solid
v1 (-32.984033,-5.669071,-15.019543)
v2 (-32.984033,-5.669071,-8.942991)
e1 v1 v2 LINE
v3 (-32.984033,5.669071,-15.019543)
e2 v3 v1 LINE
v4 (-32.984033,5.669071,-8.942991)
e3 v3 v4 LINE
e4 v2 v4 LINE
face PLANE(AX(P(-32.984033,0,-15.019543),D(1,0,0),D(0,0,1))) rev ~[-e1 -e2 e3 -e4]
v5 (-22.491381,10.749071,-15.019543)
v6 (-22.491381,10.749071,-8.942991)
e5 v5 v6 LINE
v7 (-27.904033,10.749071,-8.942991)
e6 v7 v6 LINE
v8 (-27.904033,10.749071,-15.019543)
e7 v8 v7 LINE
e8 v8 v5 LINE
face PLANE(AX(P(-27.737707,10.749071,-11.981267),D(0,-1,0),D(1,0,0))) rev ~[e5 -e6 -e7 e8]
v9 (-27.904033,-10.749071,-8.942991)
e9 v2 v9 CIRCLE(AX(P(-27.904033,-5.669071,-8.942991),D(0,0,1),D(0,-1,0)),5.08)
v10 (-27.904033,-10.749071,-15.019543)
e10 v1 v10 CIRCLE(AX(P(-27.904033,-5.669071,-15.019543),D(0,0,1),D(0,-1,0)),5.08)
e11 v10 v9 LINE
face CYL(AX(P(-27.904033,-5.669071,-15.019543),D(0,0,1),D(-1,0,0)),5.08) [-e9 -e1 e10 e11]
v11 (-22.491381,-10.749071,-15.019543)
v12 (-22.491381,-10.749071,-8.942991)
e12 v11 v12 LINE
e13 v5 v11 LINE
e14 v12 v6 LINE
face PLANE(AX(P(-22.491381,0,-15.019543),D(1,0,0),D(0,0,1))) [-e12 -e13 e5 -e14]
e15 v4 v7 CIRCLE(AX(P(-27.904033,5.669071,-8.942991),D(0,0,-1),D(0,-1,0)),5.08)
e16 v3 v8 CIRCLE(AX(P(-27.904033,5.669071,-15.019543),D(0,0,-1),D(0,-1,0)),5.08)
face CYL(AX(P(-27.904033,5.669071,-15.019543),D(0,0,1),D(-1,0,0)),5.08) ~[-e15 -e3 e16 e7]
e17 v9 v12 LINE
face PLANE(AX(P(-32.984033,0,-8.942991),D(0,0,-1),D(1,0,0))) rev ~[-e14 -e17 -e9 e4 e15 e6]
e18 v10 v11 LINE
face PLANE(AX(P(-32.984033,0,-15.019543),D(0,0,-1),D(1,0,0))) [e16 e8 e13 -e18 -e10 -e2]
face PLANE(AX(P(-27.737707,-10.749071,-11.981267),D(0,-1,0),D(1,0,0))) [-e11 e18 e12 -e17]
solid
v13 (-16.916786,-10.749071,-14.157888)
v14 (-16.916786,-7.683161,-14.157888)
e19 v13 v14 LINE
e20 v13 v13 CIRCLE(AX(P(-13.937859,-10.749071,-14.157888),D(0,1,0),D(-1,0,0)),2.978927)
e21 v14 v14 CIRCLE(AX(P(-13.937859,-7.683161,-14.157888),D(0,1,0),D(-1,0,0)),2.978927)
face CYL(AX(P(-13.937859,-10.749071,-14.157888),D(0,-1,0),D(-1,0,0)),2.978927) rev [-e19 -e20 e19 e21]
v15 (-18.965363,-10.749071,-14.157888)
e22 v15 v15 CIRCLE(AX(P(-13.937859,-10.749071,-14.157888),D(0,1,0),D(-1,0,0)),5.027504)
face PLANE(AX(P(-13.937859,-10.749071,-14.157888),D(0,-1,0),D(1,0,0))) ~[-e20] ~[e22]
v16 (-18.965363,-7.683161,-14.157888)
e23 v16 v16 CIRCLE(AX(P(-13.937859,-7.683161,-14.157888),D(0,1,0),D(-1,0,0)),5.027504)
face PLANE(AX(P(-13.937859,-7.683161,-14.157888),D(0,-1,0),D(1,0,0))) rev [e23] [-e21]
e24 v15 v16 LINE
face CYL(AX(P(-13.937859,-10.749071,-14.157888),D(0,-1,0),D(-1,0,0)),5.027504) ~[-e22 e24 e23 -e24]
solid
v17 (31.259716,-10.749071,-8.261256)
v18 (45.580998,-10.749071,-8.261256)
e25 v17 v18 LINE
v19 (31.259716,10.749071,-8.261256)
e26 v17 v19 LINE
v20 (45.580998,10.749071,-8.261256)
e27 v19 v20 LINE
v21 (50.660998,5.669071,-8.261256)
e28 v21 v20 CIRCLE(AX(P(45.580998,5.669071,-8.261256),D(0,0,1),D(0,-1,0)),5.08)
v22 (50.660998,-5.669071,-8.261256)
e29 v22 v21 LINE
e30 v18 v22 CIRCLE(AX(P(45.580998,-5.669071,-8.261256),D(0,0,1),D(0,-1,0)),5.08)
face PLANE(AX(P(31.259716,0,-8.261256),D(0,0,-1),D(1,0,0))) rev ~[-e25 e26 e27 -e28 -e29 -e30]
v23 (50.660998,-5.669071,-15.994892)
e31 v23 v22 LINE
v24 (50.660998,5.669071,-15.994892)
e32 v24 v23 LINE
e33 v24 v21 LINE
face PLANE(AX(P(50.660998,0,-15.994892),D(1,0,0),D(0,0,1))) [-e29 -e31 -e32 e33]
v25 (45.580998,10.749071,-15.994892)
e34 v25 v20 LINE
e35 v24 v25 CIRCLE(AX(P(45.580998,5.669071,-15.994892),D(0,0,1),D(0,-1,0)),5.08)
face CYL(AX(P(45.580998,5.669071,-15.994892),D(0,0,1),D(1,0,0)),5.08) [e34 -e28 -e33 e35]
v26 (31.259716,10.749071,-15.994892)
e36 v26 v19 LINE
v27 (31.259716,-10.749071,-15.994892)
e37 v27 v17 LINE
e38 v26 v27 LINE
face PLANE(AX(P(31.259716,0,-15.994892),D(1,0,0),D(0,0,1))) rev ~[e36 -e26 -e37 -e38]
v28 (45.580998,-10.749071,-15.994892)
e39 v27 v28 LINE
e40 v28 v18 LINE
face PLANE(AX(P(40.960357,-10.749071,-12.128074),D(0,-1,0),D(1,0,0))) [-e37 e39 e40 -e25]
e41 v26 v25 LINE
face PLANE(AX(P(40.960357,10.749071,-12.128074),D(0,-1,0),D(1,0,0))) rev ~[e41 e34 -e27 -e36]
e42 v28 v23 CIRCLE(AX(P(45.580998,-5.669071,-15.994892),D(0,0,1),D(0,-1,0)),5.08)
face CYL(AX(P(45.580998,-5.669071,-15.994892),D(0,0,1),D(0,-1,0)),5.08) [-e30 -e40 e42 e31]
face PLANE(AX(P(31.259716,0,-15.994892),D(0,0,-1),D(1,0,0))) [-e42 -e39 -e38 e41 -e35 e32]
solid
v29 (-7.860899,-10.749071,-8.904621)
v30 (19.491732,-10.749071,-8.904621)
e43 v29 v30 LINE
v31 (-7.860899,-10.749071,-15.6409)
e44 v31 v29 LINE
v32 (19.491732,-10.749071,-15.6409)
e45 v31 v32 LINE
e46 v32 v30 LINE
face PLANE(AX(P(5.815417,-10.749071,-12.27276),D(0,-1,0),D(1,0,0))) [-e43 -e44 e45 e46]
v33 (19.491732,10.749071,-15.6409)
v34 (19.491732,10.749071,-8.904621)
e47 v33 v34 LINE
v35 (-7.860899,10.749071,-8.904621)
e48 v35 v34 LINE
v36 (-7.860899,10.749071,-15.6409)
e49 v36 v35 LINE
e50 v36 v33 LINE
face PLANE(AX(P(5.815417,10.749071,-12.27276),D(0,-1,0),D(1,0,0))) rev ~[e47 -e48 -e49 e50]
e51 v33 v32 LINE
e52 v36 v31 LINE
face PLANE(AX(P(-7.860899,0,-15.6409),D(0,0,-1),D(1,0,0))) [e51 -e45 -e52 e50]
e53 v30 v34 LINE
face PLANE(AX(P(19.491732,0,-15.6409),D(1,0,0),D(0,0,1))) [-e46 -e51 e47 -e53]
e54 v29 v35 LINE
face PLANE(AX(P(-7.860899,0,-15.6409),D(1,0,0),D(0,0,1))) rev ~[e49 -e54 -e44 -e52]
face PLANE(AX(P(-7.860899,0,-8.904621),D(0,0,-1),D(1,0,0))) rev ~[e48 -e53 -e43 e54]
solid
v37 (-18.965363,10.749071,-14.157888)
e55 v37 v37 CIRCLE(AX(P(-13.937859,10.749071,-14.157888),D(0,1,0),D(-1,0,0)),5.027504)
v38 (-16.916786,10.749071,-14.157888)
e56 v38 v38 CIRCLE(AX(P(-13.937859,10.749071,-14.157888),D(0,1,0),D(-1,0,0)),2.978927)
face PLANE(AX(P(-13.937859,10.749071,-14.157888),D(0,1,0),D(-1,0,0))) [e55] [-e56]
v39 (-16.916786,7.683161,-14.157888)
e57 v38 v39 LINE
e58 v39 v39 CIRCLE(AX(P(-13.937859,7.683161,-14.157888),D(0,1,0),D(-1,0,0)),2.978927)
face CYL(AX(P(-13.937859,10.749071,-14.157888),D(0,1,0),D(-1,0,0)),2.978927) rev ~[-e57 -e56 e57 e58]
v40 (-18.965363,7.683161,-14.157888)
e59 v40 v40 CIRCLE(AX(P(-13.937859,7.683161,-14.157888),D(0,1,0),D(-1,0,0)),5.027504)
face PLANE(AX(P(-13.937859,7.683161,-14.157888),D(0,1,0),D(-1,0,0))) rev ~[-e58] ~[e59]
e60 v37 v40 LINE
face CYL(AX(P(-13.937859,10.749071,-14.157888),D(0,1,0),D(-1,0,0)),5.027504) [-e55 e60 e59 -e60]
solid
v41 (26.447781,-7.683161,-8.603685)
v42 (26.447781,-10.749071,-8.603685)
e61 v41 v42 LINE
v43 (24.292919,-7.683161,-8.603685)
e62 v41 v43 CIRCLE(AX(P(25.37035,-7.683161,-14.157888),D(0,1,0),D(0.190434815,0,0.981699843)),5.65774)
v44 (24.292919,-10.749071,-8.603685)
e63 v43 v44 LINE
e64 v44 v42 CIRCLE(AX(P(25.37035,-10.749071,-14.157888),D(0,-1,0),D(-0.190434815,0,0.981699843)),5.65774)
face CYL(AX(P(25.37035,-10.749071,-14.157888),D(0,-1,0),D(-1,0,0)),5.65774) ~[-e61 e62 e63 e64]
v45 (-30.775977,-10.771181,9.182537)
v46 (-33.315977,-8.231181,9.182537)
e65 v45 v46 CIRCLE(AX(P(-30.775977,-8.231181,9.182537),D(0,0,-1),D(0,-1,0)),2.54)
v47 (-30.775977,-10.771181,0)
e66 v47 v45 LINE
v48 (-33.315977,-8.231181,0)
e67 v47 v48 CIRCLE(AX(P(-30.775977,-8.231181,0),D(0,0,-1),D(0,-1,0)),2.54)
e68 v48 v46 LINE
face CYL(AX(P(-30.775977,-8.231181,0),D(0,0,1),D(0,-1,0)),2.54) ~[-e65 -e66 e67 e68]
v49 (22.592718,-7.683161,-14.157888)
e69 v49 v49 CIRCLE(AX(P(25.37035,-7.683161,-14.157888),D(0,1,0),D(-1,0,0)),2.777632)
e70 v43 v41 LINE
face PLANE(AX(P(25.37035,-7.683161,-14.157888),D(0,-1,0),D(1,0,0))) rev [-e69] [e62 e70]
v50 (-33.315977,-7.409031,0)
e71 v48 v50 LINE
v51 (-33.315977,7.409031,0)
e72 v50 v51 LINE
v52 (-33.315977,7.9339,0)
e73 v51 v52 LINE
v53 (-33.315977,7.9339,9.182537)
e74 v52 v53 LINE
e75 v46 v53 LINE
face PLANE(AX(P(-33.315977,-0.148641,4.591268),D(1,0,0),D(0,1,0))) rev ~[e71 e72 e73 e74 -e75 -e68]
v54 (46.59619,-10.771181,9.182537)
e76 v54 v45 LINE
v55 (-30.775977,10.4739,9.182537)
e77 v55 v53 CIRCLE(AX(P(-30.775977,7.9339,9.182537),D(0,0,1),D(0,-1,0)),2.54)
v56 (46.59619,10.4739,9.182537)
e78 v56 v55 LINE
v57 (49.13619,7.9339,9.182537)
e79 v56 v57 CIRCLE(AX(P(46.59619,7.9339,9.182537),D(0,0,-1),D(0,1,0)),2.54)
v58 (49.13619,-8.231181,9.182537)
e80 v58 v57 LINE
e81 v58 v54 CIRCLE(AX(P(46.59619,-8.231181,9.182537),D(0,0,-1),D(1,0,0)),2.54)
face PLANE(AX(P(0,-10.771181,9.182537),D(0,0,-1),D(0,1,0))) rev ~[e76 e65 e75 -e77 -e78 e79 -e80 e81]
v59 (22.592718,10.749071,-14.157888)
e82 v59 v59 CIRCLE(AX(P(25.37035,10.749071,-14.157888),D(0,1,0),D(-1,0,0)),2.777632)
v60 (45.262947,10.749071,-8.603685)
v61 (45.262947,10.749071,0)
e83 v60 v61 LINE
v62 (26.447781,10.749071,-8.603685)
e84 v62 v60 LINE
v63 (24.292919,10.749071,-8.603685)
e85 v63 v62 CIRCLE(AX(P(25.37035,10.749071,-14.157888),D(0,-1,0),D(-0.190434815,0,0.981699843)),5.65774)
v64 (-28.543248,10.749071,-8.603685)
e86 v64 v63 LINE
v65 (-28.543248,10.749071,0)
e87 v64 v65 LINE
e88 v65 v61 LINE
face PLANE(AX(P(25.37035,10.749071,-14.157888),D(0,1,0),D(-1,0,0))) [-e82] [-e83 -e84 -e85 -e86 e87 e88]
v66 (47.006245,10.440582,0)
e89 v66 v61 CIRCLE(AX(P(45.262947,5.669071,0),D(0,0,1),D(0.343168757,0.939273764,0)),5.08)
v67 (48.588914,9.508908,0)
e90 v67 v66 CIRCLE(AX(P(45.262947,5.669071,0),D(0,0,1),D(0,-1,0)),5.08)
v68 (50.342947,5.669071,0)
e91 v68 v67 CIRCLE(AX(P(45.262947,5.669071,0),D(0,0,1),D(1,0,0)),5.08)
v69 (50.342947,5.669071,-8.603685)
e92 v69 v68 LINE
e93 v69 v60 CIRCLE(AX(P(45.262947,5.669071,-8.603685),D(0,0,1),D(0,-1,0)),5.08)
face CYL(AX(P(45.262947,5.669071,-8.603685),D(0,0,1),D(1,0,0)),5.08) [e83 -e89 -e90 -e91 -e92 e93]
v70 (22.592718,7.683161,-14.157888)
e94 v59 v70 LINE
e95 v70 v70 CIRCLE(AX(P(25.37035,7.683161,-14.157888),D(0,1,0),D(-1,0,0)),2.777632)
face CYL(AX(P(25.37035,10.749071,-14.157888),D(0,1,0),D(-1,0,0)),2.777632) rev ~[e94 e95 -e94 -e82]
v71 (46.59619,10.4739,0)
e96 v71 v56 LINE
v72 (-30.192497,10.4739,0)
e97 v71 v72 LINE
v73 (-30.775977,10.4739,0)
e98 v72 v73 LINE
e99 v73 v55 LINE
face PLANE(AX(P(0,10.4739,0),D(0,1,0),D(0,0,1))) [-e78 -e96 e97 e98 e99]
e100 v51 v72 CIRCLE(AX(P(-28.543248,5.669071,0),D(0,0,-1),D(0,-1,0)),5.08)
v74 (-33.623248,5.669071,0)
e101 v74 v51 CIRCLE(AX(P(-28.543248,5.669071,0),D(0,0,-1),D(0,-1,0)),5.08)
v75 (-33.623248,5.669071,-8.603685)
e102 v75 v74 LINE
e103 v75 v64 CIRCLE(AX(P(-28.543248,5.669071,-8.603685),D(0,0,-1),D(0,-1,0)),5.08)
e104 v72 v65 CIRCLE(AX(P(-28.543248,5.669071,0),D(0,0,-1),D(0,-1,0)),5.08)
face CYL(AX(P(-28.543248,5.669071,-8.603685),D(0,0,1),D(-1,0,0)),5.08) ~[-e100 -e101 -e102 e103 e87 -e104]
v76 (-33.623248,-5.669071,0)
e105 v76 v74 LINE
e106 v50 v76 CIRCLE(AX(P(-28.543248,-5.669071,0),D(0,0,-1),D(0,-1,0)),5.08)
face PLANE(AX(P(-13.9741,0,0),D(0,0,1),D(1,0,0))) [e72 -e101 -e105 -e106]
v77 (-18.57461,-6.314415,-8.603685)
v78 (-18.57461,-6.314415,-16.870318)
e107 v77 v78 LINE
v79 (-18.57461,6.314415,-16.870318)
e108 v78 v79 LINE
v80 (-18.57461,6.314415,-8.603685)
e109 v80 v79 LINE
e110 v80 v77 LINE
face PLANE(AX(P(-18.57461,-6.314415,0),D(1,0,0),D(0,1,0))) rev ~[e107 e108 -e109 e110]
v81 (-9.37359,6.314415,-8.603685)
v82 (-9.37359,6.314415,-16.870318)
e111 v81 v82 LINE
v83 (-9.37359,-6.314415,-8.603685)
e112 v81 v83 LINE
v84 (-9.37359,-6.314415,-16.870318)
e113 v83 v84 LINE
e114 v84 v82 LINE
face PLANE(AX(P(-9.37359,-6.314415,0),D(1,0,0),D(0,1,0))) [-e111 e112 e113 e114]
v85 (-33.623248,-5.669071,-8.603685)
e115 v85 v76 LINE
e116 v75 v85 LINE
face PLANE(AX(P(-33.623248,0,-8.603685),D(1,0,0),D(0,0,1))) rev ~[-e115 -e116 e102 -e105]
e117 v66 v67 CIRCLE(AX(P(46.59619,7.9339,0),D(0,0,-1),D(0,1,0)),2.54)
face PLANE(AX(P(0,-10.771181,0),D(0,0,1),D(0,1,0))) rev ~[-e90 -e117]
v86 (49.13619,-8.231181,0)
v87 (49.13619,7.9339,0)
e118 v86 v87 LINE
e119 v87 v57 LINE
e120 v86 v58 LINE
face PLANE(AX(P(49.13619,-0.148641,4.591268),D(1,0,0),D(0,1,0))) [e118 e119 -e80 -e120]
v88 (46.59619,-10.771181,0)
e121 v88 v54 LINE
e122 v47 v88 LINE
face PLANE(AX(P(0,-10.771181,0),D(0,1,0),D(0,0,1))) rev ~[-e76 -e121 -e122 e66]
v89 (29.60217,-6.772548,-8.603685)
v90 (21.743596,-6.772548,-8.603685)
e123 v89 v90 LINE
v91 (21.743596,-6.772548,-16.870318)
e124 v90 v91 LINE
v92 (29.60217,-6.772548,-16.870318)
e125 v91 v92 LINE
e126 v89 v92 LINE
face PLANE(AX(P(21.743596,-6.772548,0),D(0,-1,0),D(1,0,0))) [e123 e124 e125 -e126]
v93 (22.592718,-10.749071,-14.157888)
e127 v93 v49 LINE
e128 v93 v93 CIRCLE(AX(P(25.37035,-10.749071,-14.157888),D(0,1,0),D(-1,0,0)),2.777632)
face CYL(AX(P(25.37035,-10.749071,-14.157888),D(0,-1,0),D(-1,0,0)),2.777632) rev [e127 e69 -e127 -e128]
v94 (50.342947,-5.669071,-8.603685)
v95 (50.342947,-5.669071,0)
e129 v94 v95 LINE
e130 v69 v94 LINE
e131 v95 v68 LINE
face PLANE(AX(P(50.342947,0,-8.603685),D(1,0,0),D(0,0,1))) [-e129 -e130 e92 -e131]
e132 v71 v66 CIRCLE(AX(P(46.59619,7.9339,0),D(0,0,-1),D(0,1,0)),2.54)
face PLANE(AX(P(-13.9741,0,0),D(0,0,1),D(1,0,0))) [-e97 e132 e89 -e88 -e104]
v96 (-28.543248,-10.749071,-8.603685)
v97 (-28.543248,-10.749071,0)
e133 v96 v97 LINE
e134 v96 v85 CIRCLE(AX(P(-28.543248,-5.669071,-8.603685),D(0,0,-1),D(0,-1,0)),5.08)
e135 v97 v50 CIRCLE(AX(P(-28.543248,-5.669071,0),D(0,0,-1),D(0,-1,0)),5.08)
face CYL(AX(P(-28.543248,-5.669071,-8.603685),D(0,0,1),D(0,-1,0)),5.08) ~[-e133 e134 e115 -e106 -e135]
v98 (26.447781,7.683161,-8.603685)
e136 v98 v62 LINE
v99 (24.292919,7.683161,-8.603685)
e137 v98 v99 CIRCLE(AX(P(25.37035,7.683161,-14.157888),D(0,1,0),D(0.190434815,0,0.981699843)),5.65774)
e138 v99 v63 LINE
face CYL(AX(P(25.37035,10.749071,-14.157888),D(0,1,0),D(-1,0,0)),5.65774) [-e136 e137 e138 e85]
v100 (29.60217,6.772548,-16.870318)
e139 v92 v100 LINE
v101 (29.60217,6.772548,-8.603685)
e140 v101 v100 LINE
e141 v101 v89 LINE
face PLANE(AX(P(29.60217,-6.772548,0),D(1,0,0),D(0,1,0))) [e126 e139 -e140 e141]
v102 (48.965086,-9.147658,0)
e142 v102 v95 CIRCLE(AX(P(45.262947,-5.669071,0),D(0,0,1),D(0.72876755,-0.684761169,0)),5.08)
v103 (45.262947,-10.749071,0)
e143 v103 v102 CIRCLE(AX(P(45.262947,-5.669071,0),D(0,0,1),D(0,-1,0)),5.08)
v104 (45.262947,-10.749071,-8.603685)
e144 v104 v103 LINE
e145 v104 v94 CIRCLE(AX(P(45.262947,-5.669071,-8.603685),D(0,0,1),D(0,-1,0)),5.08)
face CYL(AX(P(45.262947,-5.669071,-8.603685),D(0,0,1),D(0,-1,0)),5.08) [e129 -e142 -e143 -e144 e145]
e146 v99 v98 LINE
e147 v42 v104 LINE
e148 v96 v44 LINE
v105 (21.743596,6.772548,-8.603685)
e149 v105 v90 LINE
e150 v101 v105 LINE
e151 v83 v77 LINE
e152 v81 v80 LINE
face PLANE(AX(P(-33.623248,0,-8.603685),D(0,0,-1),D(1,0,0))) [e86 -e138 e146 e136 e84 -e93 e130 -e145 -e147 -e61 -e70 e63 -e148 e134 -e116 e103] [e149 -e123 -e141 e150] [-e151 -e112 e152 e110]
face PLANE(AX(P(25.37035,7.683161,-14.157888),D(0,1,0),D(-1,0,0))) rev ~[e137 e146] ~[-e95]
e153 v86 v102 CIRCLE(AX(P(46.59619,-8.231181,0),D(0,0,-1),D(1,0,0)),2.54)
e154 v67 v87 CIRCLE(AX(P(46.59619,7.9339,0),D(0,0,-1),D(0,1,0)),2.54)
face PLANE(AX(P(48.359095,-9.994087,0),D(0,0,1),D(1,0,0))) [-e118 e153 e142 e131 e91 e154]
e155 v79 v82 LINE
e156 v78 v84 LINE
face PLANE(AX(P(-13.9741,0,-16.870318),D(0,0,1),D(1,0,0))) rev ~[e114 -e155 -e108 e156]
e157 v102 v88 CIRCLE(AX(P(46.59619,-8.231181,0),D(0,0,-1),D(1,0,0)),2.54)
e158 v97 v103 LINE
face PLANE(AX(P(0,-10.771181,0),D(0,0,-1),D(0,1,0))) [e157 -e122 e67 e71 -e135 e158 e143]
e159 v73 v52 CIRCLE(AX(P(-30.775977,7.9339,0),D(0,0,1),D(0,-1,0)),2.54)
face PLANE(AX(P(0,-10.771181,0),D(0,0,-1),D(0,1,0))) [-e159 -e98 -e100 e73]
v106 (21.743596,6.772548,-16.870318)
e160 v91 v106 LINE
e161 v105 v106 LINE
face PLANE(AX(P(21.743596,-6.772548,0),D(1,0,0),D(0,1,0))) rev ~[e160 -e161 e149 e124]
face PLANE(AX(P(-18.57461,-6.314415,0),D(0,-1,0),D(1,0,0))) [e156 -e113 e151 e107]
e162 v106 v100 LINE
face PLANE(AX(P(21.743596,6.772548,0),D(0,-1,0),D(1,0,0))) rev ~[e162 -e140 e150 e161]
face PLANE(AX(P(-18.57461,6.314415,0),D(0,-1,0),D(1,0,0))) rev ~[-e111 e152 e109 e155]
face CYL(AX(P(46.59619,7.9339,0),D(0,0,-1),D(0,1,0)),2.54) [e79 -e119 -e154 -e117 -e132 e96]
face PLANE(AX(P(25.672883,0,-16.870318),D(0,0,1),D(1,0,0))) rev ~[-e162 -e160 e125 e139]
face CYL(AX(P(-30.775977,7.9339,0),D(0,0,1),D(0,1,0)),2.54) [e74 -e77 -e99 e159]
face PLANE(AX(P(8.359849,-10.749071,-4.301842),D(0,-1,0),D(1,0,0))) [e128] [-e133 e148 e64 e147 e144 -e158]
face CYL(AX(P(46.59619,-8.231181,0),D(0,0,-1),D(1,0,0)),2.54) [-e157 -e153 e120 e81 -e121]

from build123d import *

# Parameters (mm, degrees)
F0_W         = 83.9661955833
F0_H         = 8.6036846042
F2_DEPTH     = 10.7490709051
F1_W         = 27.3526310921
F1_H         = 6.7362785339
F1_W_2       = 19.4012820721
F1_H_2       = 7.7336356044
F1_W_3       = 10.4926526546
F1_H_3       = 6.0765519738
F4_R         = 5.08
F5_R         = 5.08
F3_R         = 5.6577404846
F3_R_2       = 2.7776319259
F6_DEPTH     = 3.0659101903
F3_R_3       = 5.0275038218
F3_R_4       = 2.978926648
F7_R         = 5.08
F8_R         = 5.08
F10_W        = 9.2010200024
F10_H        = 12.6288309693
F10_W_2      = 7.8585743904
F10_H_2      = 13.5450959206
F11_DEPTH    = 16.8703179806
F20_W        = 21.2450809777
F20_H        = 9.1825369745
F21_DEPTH    = 49.1361897439
F22_T1_DEPTH = 15.5325369745
F23_DEPTH    = 33.3159770817
F24_R        = 2.54


# Not quite as in the source:
# - a fillet or chamfer that OpenCascade refuses, or shapes differently, is made with other operations: its cross-section is extruded or revolved along the edge and cut away or added
# - a feature names something its author has since deleted; it is built from what else it names
# - the program builds the solid bodies; features that only make, move or delete a surface that nothing else refers to are left out


with BuildPart() as f2:
    # F0 (on Front) → F2 (new body, symmetric)
    with BuildSketch(Plane.XZ):
        with Locations((8.359849453, -4.3018423021)):
            Rectangle(F0_W, F0_H)
    extrude(amount=F2_DEPTH, both=True)

    # F4
    f4_edges = [f2.edges().sort_by_distance(p)[0] for p in [
        (50.342947, 10.749071, -4.301842),
        (50.342947, -10.749071, -4.301842),
    ]]
    fillet(f4_edges, radius=F4_R)

    # F3 (on face) → F6 (join)
    with BuildSketch(Plane(origin=(0, 10.7490709051, 0), x_dir=(-1, 0, 0), z_dir=(0, 1, 0))):
        with Locations((-25.3703502001, -14.1578875482)):
            Circle(F3_R)
        with Locations((-25.3703502001, -14.1578875482)):
            Circle(F3_R_2, mode=Mode.SUBTRACT)
    extrude(amount=-F6_DEPTH)

    # F7
    f7_edges = [f2.edges().sort_by_distance(p)[0] for p in [
        (-33.623248, -10.749071, -4.301842),
        (-33.623248, 10.749071, -4.301842),
    ]]
    fillet(f7_edges, radius=F7_R)

    # F9: F2, F6 across plane


with BuildPart() as f2b:
    # F1 (on Front) → F2, piece 2 (new body, symmetric)
    with BuildSketch(Plane.XZ):
        with Locations((5.8154165745, -12.272760272)):
            Rectangle(F1_W, F1_H)
    extrude(amount=F2_DEPTH, both=True)


with BuildPart() as f2c:
    # F1 (on Front) → F2, piece 3 (new body, symmetric)
    with BuildSketch(Plane.XZ):
        with Locations((40.9603565931, -12.1280737221)):
            Rectangle(F1_W_2, F1_H_2)
    extrude(amount=F2_DEPTH, both=True)

    # F5
    f5_edges = [f2c.edges().sort_by_distance(p)[0] for p in [
        (50.660998, 10.749071, -12.128074),
        (50.660998, -10.749071, -12.128074),
    ]]
    fillet(f5_edges, radius=F5_R)


with BuildPart() as f2d:
    # F1 (on Front) → F2, piece 4 (new body, symmetric)
    with BuildSketch(Plane.XZ):
        with Locations((-27.7377068996, -11.981267482)):
            Rectangle(F1_W_3, F1_H_3)
    extrude(amount=F2_DEPTH, both=True)

    # F8
    f8_edges = [f2d.edges().sort_by_distance(p)[0] for p in [
        (-32.984033, 10.749071, -11.981267),
        (-32.984033, -10.749071, -11.981267),
    ]]
    fillet(f8_edges, radius=F8_R)


with BuildPart() as f6:
    # F3 (on face) → F6, piece 2 (new body)
    with BuildSketch(Plane(origin=(0, 10.7490709051, 0), x_dir=(-1, 0, 0), z_dir=(0, 1, 0))):
        with Locations((13.9378588647, -14.1578875482)):
            Circle(F3_R_3)
        with Locations((13.9378588647, -14.1578875482)):
            Circle(F3_R_4, mode=Mode.SUBTRACT)
    extrude(amount=-F6_DEPTH)


with BuildPart() as f2_1:
    add(f2.part)
    add(f2.part.mirror(Plane.XZ))
    add(f6.part.mirror(Plane.XZ))

    # F10 (on Top) → F11 (join)
    with BuildSketch(Plane.XY):
        with Locations((-13.9741003513, 0)):
            Rectangle(F10_W, F10_H)
        with Locations((25.6728827953, 0)):
            Rectangle(F10_W_2, F10_H_2)
    extrude(amount=-F11_DEPTH)

    # F20 (on Right) → F21 (join)
    with BuildSketch(Plane.YZ):
        with Locations((-0.1486409456, 4.5912684873)):
            Rectangle(F20_W, F20_H)
    extrude(amount=F21_DEPTH)

    # F22: fillet of radius 2.54 on 2 edges, made by hand

    # F22_s2 → F22_t1 (cut)
    with BuildSketch(Plane.XY):
        with BuildLine():
            ThreePointArc((49.1361897439, -8.2311814344), (48.3922409681, -10.0272326586), (46.5961897439, -10.7711814344))
            Line((46.5961897439, -10.7711814344), (49.1361897439, -10.7711814344))
            Line((49.1361897439, -10.7711814344), (49.1361897439, -8.2311814344))
        make_face()
        with BuildLine():
            ThreePointArc((46.5961897439, 10.4738995433), (48.3922409681, 9.7299507675), (49.1361897439, 7.9338995433))
            Line((49.1361897439, 7.9338995433), (49.1361897439, 10.4738995433))
            Line((49.1361897439, 10.4738995433), (46.5961897439, 10.4738995433))
        make_face()
    extrude(amount=F22_T1_DEPTH, mode=Mode.SUBTRACT)

    # F23 (add): a face of the model
    f23_faces = [f2_1.faces().sort_by_distance(p)[0] for p in [
        (0, -0.1486409456, 4.5912684873),
    ]]
    extrude(f23_faces, amount=F23_DEPTH)

    # F24
    f24_edges = [f2_1.edges().sort_by_distance(p)[0] for p in [
        (-33.315977, 10.4739, 4.591268),
        (-33.315977, -10.771181, 4.591268),
    ]]
    fillet(f24_edges, radius=F24_R)


solid = Compound([f2b.part, f2c.part, f2d.part, f6.part, f2_1.part])
